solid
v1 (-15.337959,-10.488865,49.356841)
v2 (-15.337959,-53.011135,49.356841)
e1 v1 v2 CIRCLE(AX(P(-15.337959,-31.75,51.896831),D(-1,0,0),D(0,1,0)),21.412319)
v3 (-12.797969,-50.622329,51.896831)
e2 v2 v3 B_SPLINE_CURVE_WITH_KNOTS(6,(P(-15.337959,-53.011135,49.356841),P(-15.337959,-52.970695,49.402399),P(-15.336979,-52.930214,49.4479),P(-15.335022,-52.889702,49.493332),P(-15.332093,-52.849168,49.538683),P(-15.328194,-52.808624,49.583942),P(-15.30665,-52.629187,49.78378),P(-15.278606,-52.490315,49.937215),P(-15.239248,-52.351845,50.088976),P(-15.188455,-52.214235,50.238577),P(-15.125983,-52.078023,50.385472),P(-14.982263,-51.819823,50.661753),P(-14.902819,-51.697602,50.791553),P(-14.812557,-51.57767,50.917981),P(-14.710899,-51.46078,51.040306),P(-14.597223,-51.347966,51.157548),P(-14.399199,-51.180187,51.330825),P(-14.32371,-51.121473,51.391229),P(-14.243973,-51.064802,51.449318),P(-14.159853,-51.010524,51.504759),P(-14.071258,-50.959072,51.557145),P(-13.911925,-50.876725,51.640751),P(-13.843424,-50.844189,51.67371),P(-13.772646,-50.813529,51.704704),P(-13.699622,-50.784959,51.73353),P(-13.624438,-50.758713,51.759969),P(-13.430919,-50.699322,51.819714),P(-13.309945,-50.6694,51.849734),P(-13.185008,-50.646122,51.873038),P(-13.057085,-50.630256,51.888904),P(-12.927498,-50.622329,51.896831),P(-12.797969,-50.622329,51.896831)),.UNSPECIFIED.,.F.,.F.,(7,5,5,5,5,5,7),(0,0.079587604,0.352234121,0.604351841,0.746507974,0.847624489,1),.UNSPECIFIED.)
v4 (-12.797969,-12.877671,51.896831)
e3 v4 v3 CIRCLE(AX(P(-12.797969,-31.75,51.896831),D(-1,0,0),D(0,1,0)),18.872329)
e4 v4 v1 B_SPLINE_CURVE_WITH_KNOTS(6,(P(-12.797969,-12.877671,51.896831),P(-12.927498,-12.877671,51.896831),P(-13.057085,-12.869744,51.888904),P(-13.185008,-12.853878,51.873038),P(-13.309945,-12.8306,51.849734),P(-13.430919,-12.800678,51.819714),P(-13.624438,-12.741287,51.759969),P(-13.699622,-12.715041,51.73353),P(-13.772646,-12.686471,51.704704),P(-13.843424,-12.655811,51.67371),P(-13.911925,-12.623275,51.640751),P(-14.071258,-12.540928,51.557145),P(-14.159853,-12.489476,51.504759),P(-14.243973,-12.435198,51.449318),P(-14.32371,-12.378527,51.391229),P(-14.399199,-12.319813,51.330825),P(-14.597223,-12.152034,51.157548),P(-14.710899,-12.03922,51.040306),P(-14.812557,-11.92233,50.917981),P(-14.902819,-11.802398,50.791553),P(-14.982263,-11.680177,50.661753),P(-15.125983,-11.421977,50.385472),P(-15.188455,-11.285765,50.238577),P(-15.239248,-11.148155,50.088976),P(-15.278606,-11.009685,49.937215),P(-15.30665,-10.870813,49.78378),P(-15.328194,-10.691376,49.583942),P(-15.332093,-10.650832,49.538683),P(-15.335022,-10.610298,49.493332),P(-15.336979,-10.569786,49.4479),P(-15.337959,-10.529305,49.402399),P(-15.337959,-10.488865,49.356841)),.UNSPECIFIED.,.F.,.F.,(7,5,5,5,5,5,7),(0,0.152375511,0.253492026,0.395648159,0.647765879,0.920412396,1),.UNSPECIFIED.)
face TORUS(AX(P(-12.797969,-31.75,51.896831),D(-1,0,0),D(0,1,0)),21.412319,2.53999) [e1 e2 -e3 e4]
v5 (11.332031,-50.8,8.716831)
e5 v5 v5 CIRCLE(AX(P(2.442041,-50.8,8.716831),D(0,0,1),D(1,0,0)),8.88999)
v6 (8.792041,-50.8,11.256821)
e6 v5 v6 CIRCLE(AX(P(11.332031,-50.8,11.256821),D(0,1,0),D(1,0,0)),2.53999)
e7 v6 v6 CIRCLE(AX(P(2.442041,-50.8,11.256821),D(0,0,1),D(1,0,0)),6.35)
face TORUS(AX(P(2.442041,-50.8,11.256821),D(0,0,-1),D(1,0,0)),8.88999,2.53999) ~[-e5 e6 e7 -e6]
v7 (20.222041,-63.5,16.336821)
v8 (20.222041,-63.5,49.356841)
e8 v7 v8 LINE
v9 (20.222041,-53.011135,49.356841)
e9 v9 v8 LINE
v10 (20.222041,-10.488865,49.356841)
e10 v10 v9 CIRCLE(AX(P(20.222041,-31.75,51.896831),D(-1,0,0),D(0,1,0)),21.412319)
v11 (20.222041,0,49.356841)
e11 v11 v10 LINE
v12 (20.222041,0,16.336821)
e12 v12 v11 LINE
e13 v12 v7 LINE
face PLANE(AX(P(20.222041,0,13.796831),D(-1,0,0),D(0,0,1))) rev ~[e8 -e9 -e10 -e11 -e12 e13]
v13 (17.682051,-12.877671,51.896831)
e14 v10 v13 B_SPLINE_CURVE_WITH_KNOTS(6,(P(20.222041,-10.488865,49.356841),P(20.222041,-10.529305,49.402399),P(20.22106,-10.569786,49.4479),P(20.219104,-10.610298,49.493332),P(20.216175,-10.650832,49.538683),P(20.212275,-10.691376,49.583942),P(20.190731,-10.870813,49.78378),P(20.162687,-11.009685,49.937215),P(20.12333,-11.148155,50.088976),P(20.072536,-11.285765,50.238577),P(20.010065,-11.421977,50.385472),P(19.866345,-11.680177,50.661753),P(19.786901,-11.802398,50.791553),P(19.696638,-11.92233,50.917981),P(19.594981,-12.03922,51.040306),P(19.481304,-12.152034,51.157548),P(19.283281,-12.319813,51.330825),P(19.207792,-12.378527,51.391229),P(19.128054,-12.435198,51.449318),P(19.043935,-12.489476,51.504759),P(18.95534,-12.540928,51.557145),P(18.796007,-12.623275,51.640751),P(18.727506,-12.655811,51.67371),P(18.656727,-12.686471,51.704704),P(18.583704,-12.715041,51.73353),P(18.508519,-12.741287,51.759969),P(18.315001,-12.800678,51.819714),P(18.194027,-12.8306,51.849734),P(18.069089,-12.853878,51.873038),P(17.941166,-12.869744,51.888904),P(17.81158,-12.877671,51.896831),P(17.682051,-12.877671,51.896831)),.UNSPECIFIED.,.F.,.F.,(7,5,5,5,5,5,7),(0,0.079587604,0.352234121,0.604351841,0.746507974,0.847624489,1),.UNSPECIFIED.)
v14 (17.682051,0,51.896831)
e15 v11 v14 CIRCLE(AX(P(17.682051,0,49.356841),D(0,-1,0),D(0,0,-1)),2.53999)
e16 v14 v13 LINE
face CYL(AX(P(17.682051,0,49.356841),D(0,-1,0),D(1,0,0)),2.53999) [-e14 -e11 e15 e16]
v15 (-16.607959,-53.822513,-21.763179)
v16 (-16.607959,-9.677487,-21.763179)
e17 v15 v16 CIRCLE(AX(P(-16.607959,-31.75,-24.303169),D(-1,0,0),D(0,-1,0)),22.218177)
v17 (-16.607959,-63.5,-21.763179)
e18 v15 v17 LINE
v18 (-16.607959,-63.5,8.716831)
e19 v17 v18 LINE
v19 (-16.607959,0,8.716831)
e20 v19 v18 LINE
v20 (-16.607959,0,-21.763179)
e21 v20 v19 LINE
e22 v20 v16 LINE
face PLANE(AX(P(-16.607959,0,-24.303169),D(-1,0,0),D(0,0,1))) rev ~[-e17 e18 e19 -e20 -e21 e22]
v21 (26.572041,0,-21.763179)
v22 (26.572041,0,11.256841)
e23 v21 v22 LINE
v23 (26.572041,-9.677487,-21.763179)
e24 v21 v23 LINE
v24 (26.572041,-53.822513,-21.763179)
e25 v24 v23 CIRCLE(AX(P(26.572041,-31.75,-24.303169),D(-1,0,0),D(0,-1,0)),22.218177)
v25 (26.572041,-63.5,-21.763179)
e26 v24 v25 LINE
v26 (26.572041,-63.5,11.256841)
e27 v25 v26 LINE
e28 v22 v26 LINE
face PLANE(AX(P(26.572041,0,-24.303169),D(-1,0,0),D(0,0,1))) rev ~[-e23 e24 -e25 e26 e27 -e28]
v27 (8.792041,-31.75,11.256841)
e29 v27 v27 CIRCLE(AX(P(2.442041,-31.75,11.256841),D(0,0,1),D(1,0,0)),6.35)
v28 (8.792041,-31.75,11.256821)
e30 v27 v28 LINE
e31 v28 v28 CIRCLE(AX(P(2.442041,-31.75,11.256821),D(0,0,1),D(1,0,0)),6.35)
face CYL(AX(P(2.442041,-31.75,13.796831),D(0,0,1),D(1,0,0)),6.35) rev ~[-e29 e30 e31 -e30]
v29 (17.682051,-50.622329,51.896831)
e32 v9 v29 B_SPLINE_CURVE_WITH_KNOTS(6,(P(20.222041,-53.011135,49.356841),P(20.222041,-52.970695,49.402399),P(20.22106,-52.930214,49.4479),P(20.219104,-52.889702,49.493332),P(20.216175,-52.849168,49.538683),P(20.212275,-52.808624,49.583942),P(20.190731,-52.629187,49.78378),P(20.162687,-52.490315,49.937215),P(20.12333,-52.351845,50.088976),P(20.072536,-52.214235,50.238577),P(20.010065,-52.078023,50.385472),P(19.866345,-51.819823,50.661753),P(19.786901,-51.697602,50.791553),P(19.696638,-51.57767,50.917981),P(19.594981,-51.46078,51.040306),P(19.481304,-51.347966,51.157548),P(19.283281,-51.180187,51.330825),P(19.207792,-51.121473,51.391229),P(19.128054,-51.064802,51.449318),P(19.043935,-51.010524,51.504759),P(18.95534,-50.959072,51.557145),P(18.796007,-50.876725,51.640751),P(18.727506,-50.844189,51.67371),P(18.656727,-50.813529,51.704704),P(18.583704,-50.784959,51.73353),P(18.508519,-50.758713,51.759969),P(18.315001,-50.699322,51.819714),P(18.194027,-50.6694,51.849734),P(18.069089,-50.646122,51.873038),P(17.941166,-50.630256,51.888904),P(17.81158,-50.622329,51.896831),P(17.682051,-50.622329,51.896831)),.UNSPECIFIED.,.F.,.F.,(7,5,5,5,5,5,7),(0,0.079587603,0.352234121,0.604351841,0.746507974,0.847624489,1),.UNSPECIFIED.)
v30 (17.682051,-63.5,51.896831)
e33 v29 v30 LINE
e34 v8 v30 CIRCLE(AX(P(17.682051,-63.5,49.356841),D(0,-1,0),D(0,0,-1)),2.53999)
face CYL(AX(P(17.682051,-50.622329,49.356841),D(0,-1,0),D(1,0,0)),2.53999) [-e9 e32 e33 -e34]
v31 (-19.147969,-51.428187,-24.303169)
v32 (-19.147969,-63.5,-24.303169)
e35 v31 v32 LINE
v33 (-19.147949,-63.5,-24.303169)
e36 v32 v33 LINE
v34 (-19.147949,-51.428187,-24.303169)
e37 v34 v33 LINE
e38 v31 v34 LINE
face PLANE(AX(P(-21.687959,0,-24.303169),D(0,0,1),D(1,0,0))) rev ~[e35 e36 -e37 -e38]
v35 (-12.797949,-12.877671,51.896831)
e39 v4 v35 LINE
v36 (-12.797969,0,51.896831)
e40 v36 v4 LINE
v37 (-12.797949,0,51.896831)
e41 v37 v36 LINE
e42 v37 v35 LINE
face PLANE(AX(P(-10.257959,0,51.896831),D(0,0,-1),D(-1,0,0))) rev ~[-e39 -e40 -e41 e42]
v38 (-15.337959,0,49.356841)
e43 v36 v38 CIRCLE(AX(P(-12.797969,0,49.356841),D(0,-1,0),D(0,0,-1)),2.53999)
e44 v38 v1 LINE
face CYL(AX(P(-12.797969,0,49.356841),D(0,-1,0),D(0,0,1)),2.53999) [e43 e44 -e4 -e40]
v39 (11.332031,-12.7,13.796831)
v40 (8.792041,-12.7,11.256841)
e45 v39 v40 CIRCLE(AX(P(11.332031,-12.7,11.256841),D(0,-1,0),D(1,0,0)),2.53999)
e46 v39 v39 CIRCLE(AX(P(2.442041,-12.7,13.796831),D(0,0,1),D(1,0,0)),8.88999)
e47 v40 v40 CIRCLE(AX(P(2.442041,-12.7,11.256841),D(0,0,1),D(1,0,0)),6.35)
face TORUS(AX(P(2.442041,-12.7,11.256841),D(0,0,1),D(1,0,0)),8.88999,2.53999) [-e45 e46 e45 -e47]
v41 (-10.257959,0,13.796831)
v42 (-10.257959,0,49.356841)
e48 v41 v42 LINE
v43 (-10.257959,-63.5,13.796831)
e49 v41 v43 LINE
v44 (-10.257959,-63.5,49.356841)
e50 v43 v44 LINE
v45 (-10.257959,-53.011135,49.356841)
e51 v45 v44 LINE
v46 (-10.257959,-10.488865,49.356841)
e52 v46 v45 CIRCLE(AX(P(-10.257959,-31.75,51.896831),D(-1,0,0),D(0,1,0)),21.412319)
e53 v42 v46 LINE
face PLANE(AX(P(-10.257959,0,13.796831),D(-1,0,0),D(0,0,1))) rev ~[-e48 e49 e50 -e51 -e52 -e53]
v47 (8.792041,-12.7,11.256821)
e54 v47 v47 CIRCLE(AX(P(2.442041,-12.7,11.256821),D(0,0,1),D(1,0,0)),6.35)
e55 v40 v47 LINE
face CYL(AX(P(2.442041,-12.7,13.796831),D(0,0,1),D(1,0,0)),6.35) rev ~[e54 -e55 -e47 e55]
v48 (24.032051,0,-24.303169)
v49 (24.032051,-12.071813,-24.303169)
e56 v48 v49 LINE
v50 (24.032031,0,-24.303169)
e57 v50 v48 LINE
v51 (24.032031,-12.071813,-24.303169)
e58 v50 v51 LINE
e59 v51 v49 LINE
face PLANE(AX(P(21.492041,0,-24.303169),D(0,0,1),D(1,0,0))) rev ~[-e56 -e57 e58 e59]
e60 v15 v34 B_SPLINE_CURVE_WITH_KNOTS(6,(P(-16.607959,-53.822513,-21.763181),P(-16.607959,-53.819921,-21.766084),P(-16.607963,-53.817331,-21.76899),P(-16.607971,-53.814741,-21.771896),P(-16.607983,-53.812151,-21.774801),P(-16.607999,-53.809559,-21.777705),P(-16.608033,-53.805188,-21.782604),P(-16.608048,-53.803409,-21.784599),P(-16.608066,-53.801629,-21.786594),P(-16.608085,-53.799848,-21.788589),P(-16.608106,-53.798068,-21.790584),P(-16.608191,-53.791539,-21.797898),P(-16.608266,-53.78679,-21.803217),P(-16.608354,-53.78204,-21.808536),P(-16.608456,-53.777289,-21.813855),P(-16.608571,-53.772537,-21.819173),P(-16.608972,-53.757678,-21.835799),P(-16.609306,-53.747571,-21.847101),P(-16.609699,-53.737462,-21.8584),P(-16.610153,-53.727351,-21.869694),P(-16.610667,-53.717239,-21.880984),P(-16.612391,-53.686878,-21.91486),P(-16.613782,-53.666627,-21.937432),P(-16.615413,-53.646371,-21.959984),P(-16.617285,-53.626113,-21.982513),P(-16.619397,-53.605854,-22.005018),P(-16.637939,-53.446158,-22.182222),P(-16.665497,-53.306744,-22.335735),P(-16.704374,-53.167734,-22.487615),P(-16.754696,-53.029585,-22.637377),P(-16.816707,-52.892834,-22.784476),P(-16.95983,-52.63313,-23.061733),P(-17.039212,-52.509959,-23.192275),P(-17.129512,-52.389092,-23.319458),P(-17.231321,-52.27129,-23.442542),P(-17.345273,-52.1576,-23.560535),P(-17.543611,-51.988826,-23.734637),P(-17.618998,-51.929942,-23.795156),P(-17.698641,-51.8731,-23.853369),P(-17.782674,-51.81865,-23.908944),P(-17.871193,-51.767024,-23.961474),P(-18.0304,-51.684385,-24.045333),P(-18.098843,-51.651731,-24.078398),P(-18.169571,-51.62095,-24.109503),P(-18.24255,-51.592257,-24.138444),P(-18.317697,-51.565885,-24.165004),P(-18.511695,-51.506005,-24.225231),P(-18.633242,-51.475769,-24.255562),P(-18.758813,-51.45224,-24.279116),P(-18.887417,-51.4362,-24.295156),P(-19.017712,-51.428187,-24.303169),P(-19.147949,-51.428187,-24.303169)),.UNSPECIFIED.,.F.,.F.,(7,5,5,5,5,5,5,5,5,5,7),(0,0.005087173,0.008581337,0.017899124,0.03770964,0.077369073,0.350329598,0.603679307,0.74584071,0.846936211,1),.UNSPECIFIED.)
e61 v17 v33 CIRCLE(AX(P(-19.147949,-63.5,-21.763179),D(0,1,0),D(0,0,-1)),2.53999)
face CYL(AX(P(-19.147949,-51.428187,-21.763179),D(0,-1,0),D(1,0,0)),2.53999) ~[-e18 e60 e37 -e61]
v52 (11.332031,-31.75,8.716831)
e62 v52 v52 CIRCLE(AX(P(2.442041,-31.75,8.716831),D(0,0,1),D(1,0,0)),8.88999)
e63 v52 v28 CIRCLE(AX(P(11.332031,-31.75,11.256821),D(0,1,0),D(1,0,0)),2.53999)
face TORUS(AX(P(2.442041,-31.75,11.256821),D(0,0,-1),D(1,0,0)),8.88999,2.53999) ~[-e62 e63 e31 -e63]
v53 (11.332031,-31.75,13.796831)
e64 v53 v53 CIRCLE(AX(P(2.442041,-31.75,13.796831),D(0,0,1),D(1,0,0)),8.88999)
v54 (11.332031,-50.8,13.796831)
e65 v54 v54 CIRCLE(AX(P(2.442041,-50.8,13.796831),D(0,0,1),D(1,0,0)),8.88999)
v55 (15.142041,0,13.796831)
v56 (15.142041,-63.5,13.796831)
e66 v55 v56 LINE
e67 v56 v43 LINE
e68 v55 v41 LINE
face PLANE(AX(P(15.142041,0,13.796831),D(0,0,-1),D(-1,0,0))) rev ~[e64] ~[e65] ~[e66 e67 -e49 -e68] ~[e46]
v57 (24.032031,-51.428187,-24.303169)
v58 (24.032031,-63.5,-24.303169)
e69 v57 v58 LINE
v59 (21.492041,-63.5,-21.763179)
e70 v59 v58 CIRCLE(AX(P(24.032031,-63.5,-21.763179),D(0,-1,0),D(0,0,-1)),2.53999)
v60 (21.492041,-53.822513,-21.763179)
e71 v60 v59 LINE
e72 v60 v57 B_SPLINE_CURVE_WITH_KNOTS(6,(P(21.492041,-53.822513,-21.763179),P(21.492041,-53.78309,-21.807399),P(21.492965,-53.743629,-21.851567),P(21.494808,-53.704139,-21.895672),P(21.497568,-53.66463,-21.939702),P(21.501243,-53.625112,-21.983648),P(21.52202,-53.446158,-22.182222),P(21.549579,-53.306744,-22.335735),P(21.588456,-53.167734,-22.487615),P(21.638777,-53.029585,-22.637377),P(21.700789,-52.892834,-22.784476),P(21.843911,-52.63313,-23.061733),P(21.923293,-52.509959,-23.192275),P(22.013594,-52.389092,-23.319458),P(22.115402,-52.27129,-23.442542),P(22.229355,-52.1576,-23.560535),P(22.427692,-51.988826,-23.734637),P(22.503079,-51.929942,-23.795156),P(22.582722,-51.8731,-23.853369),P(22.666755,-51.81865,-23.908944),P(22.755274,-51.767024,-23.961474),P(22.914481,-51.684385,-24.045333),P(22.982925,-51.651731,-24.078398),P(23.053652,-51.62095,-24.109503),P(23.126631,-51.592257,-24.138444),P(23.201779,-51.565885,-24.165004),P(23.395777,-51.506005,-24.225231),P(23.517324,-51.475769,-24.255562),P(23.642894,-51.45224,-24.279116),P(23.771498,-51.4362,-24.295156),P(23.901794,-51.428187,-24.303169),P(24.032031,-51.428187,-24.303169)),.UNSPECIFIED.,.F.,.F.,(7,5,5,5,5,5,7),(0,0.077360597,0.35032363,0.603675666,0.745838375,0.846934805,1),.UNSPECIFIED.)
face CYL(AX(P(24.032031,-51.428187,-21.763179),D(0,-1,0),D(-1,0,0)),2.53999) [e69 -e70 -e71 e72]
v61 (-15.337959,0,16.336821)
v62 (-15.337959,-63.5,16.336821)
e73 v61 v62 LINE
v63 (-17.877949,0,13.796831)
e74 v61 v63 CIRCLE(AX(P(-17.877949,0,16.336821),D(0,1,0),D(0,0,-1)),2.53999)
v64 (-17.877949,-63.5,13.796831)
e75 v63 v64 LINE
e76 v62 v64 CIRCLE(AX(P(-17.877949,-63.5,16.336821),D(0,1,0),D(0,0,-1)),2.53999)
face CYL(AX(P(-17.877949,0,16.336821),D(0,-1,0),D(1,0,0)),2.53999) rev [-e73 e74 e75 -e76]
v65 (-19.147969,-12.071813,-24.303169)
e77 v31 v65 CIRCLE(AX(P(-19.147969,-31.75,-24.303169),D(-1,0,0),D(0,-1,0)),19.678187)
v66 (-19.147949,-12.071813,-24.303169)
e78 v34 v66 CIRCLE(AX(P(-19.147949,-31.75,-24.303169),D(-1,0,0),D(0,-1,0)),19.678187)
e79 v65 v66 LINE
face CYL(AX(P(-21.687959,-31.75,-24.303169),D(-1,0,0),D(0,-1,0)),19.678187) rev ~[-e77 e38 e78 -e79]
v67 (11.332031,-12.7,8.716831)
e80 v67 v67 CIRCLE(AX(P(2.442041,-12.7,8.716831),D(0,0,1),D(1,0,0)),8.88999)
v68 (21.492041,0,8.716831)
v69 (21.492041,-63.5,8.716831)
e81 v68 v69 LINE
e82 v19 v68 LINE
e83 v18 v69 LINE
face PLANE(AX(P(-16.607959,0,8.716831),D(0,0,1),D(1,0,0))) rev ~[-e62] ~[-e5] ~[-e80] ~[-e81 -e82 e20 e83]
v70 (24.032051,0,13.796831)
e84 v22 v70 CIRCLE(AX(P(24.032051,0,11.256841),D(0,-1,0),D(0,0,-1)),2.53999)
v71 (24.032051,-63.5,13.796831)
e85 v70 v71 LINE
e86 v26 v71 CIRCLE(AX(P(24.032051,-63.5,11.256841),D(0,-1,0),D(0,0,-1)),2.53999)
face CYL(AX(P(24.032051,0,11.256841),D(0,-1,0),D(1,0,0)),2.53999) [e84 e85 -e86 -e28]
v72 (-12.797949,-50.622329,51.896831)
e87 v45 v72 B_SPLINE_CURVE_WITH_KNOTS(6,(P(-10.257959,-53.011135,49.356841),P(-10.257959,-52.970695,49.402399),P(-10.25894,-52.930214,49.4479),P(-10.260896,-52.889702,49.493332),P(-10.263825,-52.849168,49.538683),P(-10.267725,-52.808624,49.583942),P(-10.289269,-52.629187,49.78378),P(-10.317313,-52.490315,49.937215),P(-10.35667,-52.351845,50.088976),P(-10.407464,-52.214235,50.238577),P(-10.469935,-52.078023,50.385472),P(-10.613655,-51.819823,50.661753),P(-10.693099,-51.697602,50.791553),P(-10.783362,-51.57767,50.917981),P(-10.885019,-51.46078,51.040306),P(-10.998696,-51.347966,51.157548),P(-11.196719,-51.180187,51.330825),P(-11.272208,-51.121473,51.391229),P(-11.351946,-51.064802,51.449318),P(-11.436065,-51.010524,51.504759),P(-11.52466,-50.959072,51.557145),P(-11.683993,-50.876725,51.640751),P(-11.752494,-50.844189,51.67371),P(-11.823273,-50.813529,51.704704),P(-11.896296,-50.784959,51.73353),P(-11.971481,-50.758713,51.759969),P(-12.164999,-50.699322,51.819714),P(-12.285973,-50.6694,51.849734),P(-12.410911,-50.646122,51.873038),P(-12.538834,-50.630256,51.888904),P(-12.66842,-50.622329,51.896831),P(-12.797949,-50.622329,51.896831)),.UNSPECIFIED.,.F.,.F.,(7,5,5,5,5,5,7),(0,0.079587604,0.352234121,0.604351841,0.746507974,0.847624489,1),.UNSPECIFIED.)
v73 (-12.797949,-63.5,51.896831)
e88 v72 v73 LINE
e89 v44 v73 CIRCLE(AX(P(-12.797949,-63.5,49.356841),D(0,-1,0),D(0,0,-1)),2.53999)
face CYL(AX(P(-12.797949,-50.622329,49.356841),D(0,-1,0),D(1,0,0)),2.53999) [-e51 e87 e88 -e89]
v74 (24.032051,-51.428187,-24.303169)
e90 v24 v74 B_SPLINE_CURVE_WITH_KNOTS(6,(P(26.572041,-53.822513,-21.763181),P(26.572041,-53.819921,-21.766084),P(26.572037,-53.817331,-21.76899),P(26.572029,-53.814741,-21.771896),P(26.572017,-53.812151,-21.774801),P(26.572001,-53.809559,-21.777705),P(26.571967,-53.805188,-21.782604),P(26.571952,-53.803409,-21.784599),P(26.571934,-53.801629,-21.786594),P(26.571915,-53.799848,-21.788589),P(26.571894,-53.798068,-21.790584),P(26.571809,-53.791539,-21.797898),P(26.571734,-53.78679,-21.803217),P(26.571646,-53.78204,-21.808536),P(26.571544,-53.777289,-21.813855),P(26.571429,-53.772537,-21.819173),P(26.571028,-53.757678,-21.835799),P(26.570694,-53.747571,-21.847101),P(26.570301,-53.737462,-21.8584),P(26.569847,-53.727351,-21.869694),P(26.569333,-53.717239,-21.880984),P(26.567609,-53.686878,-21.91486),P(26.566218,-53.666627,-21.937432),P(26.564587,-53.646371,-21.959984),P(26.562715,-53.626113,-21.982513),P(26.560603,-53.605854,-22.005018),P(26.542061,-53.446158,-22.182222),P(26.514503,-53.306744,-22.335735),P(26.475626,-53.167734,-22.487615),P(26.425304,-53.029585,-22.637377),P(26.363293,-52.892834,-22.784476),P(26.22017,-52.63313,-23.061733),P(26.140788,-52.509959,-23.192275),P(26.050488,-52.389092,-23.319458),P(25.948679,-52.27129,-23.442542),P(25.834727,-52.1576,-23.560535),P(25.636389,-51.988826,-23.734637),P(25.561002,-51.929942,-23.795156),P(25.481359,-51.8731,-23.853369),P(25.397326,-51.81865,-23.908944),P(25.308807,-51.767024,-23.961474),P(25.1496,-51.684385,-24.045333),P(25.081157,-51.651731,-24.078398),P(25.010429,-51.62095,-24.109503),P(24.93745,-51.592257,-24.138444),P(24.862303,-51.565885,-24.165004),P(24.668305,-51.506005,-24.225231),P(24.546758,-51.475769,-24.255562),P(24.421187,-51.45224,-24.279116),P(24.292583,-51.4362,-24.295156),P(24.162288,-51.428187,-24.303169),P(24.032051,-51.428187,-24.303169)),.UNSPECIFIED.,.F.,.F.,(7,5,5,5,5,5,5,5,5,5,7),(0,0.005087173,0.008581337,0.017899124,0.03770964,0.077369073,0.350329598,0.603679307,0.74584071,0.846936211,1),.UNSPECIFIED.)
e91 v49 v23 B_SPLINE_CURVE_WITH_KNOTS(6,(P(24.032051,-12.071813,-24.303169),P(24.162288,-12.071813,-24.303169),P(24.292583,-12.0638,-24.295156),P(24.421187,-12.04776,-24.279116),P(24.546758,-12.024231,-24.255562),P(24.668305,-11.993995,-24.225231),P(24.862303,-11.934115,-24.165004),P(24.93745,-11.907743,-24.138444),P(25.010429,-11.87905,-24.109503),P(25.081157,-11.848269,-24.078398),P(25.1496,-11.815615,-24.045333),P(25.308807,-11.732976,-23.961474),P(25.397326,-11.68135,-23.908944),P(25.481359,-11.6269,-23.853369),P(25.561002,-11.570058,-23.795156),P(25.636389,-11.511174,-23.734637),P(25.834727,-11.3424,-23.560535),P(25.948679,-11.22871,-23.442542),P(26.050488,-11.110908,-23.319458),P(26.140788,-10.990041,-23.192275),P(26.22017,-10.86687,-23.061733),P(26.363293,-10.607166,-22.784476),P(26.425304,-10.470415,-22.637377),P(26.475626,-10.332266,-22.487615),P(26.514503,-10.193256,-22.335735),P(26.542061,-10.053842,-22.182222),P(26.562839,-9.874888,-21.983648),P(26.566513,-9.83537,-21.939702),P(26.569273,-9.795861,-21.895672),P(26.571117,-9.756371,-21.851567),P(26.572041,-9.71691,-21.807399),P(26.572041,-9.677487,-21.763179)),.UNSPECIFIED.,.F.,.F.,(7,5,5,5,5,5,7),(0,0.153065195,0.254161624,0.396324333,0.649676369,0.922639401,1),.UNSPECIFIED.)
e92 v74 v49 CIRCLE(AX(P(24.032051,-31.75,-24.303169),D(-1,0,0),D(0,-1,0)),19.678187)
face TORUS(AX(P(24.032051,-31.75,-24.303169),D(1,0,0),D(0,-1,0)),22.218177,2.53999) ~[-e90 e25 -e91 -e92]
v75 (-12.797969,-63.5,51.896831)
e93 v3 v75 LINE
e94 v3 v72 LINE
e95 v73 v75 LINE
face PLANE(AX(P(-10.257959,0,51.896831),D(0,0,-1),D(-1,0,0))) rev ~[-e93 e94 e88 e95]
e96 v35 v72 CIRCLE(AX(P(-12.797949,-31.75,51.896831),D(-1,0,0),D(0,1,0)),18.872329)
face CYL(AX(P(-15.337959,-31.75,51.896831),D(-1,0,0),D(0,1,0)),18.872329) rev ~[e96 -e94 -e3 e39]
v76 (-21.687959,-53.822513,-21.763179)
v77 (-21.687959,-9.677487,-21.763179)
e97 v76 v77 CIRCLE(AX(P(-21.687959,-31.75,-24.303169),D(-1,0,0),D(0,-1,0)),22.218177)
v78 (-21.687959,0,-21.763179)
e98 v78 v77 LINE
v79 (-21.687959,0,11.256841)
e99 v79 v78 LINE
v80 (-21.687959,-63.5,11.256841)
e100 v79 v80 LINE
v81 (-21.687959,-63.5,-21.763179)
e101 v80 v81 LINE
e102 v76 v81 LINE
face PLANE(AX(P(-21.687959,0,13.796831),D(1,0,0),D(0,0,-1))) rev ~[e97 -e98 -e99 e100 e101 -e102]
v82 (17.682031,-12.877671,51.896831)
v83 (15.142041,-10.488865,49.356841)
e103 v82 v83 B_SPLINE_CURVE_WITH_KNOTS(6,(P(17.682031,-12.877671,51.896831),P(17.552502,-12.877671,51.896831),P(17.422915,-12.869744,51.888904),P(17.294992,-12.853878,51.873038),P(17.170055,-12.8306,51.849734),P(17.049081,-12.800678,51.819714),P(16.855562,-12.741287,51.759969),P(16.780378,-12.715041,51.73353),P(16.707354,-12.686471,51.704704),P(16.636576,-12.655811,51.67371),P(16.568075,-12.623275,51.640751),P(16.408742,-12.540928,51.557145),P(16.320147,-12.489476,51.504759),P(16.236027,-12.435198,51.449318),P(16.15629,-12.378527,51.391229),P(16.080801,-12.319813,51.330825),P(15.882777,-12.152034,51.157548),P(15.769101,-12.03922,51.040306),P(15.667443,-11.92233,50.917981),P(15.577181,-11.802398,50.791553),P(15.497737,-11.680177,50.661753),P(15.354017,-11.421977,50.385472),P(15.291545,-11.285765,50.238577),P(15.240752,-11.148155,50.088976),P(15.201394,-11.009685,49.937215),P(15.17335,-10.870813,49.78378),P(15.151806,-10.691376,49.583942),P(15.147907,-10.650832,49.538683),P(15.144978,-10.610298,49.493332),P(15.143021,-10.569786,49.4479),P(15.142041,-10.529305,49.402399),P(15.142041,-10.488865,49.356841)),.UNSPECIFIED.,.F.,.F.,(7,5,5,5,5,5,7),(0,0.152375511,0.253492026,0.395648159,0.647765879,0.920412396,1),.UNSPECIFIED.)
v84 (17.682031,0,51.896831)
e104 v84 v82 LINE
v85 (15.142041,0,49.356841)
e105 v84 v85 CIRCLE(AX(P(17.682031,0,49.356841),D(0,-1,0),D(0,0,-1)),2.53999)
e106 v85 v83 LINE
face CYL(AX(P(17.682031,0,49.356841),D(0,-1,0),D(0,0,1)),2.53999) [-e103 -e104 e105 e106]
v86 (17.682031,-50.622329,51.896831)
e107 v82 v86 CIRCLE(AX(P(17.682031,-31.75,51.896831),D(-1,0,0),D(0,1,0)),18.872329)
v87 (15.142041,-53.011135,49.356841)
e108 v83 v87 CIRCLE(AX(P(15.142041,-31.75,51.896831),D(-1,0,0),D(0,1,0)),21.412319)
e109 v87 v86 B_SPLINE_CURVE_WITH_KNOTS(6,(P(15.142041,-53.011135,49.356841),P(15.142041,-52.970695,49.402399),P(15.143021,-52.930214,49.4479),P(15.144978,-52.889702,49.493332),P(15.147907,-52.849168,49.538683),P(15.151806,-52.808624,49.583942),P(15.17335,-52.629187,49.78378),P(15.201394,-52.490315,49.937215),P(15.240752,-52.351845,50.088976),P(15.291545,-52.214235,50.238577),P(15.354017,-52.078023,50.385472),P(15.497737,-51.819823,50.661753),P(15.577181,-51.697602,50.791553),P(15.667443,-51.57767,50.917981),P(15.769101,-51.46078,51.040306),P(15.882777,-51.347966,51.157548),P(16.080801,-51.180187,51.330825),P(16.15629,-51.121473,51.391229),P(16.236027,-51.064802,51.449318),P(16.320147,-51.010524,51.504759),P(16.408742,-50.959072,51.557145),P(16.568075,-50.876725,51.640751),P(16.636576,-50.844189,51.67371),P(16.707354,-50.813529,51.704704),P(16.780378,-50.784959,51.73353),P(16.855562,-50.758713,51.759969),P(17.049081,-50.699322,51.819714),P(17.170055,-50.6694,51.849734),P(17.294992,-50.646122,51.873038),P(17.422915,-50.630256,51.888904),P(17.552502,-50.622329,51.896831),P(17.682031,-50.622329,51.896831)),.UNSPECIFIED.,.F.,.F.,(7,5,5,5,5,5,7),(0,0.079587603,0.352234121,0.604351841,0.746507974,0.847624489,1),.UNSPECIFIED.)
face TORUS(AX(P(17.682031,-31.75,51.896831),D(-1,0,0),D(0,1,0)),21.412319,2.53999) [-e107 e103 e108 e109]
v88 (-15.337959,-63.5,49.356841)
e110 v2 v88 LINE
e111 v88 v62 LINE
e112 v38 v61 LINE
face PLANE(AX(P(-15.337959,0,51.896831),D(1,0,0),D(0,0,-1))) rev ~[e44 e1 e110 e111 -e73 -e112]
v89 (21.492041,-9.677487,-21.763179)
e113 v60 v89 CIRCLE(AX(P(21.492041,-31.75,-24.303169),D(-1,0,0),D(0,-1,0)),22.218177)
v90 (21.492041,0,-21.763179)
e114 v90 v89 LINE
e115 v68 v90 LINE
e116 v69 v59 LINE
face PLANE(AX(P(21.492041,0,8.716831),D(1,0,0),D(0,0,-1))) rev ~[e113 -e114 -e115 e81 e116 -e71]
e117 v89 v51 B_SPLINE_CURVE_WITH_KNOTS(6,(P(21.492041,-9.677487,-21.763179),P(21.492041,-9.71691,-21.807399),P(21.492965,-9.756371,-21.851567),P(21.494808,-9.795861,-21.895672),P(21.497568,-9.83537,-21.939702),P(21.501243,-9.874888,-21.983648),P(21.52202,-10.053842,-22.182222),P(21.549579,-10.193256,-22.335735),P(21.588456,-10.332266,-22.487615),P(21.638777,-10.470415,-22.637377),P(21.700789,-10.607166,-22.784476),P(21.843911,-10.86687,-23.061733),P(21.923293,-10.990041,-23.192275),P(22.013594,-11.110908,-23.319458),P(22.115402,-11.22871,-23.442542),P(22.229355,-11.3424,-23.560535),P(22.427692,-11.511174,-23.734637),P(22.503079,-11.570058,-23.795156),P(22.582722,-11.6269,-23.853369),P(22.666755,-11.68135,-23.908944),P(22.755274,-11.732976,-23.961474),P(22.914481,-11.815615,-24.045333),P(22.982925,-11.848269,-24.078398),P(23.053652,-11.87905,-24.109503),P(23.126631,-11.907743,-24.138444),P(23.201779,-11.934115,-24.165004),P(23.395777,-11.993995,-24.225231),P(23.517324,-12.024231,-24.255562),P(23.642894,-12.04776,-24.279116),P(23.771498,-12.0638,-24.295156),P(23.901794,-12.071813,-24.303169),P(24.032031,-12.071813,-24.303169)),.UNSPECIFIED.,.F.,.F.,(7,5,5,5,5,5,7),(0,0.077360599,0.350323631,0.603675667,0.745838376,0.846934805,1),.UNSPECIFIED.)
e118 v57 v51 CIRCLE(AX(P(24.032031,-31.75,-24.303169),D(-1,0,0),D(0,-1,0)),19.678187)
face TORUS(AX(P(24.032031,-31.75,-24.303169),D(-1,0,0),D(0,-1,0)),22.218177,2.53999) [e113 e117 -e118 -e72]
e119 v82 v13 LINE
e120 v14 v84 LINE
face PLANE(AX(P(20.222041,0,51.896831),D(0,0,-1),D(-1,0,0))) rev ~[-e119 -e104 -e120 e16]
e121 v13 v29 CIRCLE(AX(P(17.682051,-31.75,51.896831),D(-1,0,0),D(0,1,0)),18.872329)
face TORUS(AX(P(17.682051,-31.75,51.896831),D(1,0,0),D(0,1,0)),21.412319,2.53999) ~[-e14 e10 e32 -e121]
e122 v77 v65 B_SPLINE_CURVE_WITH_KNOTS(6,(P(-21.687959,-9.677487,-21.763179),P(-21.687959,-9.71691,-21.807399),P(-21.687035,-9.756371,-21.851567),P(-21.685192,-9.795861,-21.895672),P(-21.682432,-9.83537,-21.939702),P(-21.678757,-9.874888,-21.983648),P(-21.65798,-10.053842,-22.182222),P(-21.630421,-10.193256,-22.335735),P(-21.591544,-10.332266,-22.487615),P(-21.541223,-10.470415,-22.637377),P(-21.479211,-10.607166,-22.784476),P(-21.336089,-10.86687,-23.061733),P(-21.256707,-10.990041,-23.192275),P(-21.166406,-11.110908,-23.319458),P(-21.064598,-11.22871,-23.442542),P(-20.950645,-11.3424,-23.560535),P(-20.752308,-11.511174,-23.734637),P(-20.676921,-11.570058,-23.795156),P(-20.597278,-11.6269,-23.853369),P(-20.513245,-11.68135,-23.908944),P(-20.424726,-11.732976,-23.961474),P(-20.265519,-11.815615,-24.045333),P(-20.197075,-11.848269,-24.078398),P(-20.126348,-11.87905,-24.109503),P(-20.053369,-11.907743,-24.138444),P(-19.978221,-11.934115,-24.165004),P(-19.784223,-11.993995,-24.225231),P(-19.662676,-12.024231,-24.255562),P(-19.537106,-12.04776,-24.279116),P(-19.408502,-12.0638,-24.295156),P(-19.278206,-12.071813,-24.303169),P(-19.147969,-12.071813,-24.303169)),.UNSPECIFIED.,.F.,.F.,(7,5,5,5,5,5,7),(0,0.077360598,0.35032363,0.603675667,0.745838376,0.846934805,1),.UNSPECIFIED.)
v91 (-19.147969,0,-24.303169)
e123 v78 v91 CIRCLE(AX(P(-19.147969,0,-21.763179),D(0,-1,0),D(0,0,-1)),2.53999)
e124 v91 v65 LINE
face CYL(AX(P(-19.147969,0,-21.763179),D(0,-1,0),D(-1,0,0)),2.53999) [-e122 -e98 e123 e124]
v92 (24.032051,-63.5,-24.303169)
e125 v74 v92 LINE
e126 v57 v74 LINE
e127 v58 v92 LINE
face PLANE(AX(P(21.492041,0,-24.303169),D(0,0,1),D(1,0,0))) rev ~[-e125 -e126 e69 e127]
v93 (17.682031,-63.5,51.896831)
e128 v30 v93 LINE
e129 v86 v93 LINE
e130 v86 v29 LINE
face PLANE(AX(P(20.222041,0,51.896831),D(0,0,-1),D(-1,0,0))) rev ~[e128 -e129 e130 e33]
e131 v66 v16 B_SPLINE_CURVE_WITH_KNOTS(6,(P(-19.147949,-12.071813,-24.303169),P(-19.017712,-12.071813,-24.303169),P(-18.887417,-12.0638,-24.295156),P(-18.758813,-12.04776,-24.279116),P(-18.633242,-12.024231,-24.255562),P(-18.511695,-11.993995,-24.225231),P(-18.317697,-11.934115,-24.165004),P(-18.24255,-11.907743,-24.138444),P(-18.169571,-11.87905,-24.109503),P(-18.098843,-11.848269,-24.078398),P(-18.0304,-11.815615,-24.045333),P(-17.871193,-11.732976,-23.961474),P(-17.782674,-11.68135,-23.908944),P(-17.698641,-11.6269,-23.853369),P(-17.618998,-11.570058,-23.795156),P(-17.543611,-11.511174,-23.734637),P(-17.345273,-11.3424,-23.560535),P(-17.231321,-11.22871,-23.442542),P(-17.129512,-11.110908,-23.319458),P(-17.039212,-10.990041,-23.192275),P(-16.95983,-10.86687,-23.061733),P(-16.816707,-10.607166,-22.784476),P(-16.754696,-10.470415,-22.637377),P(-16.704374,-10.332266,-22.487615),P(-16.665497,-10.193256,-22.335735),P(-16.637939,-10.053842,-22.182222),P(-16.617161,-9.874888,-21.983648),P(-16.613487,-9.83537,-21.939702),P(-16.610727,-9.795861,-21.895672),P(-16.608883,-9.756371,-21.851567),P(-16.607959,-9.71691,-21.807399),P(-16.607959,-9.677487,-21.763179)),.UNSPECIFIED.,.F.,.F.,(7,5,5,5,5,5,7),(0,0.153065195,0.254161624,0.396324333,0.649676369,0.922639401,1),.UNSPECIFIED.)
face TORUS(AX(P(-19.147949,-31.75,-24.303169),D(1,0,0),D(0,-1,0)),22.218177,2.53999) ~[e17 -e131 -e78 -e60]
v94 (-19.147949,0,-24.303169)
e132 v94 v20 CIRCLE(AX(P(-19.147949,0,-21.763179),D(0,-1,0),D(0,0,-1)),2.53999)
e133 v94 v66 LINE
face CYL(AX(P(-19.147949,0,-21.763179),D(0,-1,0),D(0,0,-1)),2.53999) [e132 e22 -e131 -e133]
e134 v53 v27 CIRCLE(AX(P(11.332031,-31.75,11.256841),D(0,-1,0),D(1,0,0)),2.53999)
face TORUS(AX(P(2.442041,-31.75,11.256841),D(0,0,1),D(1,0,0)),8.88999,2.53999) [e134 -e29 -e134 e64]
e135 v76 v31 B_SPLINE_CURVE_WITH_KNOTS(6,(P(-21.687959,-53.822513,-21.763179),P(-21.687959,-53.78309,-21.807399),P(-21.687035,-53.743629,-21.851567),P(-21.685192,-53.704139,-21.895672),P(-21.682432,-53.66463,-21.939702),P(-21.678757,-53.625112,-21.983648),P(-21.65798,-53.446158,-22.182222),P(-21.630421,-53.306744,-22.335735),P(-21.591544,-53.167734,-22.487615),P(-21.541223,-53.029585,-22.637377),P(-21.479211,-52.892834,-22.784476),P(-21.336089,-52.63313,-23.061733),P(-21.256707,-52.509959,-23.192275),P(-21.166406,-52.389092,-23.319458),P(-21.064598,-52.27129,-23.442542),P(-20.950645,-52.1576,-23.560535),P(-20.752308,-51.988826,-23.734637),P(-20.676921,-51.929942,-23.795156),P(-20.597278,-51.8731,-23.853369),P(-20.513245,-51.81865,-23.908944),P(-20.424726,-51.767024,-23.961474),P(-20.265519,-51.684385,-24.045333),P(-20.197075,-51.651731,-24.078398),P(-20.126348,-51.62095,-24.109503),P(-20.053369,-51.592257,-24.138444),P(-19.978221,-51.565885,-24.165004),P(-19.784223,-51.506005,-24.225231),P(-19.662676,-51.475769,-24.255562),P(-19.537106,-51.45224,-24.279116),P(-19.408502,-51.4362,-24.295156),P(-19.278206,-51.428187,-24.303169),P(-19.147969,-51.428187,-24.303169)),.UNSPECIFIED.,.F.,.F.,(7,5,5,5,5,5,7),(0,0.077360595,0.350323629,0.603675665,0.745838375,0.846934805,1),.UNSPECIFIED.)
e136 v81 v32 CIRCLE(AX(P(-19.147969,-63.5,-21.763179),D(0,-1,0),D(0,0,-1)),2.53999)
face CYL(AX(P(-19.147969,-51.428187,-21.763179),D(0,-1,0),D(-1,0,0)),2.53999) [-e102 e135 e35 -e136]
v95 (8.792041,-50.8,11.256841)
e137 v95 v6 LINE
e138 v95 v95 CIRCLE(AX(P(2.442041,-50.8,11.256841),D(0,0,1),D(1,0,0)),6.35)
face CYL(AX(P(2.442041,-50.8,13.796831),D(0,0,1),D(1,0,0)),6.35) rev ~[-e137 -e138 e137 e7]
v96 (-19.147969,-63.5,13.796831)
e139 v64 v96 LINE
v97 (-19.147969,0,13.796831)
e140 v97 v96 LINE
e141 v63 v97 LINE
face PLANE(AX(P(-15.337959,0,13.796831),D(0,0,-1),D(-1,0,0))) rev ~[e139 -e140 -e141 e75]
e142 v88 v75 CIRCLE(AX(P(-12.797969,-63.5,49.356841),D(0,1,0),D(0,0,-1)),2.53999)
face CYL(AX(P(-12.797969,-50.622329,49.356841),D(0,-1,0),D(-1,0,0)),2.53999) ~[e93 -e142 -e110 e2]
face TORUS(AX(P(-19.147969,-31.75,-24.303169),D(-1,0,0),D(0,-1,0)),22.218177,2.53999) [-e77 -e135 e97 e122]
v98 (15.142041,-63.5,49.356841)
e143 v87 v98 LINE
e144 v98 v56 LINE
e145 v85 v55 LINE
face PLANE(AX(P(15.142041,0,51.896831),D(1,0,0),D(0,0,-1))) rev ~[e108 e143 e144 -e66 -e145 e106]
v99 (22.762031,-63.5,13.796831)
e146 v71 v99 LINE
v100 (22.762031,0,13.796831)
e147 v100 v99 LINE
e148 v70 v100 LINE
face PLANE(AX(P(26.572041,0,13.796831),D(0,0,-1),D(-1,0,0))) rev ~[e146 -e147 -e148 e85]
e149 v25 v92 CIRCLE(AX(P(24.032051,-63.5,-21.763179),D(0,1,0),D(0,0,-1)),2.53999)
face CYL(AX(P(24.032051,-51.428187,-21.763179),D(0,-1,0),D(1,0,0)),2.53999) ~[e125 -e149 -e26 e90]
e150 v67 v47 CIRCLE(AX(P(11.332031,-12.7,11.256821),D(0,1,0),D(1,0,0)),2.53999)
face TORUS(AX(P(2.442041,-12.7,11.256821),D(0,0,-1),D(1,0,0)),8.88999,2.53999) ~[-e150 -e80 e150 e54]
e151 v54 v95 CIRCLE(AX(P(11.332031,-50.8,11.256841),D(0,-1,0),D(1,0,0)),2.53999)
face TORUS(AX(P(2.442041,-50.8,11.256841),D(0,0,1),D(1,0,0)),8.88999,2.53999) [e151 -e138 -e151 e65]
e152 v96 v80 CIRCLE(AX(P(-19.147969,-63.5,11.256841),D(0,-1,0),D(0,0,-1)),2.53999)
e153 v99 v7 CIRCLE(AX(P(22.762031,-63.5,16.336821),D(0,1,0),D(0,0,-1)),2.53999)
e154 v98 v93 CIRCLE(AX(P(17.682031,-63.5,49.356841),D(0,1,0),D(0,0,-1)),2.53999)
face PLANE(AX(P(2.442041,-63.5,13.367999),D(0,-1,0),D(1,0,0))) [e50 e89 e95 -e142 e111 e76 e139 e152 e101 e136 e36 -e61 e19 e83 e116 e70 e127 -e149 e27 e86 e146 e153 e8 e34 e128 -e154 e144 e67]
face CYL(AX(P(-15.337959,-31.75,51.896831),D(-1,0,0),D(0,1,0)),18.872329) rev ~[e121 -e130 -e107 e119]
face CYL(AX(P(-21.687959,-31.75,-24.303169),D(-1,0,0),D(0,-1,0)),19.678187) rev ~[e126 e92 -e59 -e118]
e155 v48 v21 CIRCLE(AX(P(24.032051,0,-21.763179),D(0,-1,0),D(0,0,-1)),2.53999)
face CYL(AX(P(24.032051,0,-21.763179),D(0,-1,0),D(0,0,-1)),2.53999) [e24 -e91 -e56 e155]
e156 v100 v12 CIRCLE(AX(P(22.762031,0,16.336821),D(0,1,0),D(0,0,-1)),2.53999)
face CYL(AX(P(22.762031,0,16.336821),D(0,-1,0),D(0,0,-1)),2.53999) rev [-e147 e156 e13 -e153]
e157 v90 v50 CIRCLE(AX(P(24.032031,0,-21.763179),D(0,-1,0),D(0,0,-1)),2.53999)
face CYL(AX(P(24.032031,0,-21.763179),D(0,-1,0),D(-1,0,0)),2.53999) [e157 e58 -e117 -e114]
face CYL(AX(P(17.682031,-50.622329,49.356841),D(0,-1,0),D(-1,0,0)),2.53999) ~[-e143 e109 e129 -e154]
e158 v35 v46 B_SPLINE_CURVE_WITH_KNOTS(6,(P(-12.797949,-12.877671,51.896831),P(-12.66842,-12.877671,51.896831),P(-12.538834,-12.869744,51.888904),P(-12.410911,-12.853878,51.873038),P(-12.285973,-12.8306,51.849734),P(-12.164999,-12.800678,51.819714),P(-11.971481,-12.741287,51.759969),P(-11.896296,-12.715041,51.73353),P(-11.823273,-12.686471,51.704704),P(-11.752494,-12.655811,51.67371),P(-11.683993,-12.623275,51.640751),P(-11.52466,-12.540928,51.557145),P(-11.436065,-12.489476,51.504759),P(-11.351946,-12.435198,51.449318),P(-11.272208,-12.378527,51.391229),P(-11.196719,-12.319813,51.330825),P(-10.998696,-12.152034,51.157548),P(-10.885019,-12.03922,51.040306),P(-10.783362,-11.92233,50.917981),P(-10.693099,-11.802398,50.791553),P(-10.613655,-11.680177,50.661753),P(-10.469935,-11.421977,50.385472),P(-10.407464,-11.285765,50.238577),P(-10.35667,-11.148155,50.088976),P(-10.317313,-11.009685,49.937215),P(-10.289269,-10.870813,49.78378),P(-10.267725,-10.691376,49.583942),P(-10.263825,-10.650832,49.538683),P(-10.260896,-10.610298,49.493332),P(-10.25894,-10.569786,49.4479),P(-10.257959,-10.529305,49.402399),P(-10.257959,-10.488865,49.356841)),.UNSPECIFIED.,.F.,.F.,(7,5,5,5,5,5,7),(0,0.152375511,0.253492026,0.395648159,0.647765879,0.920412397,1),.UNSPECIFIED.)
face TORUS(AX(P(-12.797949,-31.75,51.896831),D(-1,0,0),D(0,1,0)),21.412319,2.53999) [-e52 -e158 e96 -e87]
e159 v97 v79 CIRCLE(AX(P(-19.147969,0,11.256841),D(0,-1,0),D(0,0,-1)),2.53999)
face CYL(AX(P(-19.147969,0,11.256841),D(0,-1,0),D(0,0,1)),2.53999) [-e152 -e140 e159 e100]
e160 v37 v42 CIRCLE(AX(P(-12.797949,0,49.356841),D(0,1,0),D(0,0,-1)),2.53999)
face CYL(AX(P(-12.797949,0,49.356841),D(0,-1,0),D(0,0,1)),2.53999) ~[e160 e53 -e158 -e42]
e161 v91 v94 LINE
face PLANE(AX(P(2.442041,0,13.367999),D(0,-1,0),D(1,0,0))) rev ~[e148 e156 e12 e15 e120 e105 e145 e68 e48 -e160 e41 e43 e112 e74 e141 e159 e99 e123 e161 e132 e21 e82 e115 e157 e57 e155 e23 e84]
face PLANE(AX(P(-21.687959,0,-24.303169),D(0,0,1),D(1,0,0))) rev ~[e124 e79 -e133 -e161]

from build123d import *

# Parameters (mm, degrees)
F1_DEPTH = 63.5
F3_DEPTH = 48.261
F5_DEPTH = 41.911
F6_R     = 6.35
F7_DEPTH = 25.4
F8_R     = 2.53999


# Not quite as in the source:
# - a fillet or chamfer is up to 0.001 mm smaller than in the source, because OpenCascade refuses the exact size


with BuildPart() as f1:
    # F0 (on Front) → F1 (new body)
    with BuildSketch(Plane.XZ):
        Polygon((-10.2579592133, 51.8968305746), (-15.3379592133, 51.8968305746), (-15.3379592133, 13.7968305746), (-21.6879592133, 13.7968305746), (-21.6879592133, -24.3031694254), (-16.6079592133, -24.3031694254), (-16.6079592133, 8.7168305746), (21.4920407867, 8.7168305746), (21.4920407867, -24.3031694254), (26.5720407867, -24.3031694254), (26.5720407867, 13.7968305746), (20.2220407867, 13.7968305746), (20.2220407867, 51.8968305746), (15.1420407867, 51.8968305746), (15.1420407867, 13.7968305746), (-10.2579592133, 13.7968305746), align=None)
    extrude(amount=F1_DEPTH)

    # F2 (on face) → F3 (cut, through all)
    with BuildSketch(Plane(origin=(-21.6879592133, 0, 0), x_dir=(0, -1, 0), z_dir=(-1, 0, 0))):
        with BuildLine():
            Line((12.071813307, -24.3031694254), (51.428186693, -24.3031694254))
            ThreePointArc((51.428186693, -24.3031694254), (31.75, -4.6249827324), (12.071813307, -24.3031694254))
        make_face()
    extrude(amount=-F3_DEPTH, mode=Mode.SUBTRACT)

    # F4 (on face) → F5 (cut, through all)
    with BuildSketch(Plane(origin=(-15.3379592133, 0, 0), x_dir=(0, -1, 0), z_dir=(-1, 0, 0))):
        with BuildLine():
            ThreePointArc((12.8776709251, 51.8968305746), (31.75, 33.0245014997), (50.6223290749, 51.8968305746))
            Line((50.6223290749, 51.8968305746), (12.8776709251, 51.8968305746))
        make_face()
    extrude(amount=-F5_DEPTH, mode=Mode.SUBTRACT)

    # F6 (on face) → F7 (cut)
    with BuildSketch(Plane.XY.offset(13.7968305746)):
        with Locations((2.4420407867, -50.8)):
            Circle(F6_R)
        with Locations((2.4420407867, -12.7)):
            Circle(F6_R)
        with Locations((2.4420407867, -31.75)):
            Circle(F6_R)
    extrude(amount=-F7_DEPTH, mode=Mode.SUBTRACT)

    # F8 (radius 2.54 in the source; OpenCascade refuses exactly that, so slightly less here)
    f8_edges = [f1.edges().sort_by_distance(p)[0] for p in [
        (20.222041, -31.75, 13.796831),
        (26.572041, -31.75, 13.796831),
        (-21.687959, -31.75, 13.796831),
        (-15.337959, -31.75, 13.796831),
        (15.142041, -57.061165, 51.896831),
        (15.142041, -6.438835, 51.896831),
        (-10.257959, -6.438835, 51.896831),
        (-10.257959, -57.061165, 51.896831),
        (-15.337959, -6.438835, 51.896831),
        (-15.337959, -57.061165, 51.896831),
        (20.222041, -57.061165, 51.896831),
        (20.222041, -6.438835, 51.896831),
        (26.572041, -57.464093, -24.303169),
        (21.492041, -57.464093, -24.303169),
        (21.492041, -6.035907, -24.303169),
        (26.572041, -6.035907, -24.303169),
        (-16.607959, -6.035907, -24.303169),
        (-21.687959, -6.035907, -24.303169),
        (-21.687959, -57.464093, -24.303169),
        (-16.607959, -57.464093, -24.303169),
        (-10.257959, -31.75, 33.024501),
        (-15.337959, -31.75, 33.024501),
        (20.222041, -31.75, 33.024501),
        (15.142041, -31.75, 33.024501),
        (26.572041, -31.75, -4.624983),
        (21.492041, -31.75, -4.624983),
        (-16.607959, -31.75, -4.624983),
        (-21.687959, -31.75, -4.624983),
        (-3.907959, -50.8, 13.796831),
        (-3.907959, -31.75, 13.796831),
        (-3.907959, -12.7, 13.796831),
        (-3.907959, -50.8, 8.716831),
        (-3.907959, -31.75, 8.716831),
        (-3.907959, -12.7, 8.716831),
    ]]
    fillet(f8_edges, radius=F8_R)


solid = f1.part
